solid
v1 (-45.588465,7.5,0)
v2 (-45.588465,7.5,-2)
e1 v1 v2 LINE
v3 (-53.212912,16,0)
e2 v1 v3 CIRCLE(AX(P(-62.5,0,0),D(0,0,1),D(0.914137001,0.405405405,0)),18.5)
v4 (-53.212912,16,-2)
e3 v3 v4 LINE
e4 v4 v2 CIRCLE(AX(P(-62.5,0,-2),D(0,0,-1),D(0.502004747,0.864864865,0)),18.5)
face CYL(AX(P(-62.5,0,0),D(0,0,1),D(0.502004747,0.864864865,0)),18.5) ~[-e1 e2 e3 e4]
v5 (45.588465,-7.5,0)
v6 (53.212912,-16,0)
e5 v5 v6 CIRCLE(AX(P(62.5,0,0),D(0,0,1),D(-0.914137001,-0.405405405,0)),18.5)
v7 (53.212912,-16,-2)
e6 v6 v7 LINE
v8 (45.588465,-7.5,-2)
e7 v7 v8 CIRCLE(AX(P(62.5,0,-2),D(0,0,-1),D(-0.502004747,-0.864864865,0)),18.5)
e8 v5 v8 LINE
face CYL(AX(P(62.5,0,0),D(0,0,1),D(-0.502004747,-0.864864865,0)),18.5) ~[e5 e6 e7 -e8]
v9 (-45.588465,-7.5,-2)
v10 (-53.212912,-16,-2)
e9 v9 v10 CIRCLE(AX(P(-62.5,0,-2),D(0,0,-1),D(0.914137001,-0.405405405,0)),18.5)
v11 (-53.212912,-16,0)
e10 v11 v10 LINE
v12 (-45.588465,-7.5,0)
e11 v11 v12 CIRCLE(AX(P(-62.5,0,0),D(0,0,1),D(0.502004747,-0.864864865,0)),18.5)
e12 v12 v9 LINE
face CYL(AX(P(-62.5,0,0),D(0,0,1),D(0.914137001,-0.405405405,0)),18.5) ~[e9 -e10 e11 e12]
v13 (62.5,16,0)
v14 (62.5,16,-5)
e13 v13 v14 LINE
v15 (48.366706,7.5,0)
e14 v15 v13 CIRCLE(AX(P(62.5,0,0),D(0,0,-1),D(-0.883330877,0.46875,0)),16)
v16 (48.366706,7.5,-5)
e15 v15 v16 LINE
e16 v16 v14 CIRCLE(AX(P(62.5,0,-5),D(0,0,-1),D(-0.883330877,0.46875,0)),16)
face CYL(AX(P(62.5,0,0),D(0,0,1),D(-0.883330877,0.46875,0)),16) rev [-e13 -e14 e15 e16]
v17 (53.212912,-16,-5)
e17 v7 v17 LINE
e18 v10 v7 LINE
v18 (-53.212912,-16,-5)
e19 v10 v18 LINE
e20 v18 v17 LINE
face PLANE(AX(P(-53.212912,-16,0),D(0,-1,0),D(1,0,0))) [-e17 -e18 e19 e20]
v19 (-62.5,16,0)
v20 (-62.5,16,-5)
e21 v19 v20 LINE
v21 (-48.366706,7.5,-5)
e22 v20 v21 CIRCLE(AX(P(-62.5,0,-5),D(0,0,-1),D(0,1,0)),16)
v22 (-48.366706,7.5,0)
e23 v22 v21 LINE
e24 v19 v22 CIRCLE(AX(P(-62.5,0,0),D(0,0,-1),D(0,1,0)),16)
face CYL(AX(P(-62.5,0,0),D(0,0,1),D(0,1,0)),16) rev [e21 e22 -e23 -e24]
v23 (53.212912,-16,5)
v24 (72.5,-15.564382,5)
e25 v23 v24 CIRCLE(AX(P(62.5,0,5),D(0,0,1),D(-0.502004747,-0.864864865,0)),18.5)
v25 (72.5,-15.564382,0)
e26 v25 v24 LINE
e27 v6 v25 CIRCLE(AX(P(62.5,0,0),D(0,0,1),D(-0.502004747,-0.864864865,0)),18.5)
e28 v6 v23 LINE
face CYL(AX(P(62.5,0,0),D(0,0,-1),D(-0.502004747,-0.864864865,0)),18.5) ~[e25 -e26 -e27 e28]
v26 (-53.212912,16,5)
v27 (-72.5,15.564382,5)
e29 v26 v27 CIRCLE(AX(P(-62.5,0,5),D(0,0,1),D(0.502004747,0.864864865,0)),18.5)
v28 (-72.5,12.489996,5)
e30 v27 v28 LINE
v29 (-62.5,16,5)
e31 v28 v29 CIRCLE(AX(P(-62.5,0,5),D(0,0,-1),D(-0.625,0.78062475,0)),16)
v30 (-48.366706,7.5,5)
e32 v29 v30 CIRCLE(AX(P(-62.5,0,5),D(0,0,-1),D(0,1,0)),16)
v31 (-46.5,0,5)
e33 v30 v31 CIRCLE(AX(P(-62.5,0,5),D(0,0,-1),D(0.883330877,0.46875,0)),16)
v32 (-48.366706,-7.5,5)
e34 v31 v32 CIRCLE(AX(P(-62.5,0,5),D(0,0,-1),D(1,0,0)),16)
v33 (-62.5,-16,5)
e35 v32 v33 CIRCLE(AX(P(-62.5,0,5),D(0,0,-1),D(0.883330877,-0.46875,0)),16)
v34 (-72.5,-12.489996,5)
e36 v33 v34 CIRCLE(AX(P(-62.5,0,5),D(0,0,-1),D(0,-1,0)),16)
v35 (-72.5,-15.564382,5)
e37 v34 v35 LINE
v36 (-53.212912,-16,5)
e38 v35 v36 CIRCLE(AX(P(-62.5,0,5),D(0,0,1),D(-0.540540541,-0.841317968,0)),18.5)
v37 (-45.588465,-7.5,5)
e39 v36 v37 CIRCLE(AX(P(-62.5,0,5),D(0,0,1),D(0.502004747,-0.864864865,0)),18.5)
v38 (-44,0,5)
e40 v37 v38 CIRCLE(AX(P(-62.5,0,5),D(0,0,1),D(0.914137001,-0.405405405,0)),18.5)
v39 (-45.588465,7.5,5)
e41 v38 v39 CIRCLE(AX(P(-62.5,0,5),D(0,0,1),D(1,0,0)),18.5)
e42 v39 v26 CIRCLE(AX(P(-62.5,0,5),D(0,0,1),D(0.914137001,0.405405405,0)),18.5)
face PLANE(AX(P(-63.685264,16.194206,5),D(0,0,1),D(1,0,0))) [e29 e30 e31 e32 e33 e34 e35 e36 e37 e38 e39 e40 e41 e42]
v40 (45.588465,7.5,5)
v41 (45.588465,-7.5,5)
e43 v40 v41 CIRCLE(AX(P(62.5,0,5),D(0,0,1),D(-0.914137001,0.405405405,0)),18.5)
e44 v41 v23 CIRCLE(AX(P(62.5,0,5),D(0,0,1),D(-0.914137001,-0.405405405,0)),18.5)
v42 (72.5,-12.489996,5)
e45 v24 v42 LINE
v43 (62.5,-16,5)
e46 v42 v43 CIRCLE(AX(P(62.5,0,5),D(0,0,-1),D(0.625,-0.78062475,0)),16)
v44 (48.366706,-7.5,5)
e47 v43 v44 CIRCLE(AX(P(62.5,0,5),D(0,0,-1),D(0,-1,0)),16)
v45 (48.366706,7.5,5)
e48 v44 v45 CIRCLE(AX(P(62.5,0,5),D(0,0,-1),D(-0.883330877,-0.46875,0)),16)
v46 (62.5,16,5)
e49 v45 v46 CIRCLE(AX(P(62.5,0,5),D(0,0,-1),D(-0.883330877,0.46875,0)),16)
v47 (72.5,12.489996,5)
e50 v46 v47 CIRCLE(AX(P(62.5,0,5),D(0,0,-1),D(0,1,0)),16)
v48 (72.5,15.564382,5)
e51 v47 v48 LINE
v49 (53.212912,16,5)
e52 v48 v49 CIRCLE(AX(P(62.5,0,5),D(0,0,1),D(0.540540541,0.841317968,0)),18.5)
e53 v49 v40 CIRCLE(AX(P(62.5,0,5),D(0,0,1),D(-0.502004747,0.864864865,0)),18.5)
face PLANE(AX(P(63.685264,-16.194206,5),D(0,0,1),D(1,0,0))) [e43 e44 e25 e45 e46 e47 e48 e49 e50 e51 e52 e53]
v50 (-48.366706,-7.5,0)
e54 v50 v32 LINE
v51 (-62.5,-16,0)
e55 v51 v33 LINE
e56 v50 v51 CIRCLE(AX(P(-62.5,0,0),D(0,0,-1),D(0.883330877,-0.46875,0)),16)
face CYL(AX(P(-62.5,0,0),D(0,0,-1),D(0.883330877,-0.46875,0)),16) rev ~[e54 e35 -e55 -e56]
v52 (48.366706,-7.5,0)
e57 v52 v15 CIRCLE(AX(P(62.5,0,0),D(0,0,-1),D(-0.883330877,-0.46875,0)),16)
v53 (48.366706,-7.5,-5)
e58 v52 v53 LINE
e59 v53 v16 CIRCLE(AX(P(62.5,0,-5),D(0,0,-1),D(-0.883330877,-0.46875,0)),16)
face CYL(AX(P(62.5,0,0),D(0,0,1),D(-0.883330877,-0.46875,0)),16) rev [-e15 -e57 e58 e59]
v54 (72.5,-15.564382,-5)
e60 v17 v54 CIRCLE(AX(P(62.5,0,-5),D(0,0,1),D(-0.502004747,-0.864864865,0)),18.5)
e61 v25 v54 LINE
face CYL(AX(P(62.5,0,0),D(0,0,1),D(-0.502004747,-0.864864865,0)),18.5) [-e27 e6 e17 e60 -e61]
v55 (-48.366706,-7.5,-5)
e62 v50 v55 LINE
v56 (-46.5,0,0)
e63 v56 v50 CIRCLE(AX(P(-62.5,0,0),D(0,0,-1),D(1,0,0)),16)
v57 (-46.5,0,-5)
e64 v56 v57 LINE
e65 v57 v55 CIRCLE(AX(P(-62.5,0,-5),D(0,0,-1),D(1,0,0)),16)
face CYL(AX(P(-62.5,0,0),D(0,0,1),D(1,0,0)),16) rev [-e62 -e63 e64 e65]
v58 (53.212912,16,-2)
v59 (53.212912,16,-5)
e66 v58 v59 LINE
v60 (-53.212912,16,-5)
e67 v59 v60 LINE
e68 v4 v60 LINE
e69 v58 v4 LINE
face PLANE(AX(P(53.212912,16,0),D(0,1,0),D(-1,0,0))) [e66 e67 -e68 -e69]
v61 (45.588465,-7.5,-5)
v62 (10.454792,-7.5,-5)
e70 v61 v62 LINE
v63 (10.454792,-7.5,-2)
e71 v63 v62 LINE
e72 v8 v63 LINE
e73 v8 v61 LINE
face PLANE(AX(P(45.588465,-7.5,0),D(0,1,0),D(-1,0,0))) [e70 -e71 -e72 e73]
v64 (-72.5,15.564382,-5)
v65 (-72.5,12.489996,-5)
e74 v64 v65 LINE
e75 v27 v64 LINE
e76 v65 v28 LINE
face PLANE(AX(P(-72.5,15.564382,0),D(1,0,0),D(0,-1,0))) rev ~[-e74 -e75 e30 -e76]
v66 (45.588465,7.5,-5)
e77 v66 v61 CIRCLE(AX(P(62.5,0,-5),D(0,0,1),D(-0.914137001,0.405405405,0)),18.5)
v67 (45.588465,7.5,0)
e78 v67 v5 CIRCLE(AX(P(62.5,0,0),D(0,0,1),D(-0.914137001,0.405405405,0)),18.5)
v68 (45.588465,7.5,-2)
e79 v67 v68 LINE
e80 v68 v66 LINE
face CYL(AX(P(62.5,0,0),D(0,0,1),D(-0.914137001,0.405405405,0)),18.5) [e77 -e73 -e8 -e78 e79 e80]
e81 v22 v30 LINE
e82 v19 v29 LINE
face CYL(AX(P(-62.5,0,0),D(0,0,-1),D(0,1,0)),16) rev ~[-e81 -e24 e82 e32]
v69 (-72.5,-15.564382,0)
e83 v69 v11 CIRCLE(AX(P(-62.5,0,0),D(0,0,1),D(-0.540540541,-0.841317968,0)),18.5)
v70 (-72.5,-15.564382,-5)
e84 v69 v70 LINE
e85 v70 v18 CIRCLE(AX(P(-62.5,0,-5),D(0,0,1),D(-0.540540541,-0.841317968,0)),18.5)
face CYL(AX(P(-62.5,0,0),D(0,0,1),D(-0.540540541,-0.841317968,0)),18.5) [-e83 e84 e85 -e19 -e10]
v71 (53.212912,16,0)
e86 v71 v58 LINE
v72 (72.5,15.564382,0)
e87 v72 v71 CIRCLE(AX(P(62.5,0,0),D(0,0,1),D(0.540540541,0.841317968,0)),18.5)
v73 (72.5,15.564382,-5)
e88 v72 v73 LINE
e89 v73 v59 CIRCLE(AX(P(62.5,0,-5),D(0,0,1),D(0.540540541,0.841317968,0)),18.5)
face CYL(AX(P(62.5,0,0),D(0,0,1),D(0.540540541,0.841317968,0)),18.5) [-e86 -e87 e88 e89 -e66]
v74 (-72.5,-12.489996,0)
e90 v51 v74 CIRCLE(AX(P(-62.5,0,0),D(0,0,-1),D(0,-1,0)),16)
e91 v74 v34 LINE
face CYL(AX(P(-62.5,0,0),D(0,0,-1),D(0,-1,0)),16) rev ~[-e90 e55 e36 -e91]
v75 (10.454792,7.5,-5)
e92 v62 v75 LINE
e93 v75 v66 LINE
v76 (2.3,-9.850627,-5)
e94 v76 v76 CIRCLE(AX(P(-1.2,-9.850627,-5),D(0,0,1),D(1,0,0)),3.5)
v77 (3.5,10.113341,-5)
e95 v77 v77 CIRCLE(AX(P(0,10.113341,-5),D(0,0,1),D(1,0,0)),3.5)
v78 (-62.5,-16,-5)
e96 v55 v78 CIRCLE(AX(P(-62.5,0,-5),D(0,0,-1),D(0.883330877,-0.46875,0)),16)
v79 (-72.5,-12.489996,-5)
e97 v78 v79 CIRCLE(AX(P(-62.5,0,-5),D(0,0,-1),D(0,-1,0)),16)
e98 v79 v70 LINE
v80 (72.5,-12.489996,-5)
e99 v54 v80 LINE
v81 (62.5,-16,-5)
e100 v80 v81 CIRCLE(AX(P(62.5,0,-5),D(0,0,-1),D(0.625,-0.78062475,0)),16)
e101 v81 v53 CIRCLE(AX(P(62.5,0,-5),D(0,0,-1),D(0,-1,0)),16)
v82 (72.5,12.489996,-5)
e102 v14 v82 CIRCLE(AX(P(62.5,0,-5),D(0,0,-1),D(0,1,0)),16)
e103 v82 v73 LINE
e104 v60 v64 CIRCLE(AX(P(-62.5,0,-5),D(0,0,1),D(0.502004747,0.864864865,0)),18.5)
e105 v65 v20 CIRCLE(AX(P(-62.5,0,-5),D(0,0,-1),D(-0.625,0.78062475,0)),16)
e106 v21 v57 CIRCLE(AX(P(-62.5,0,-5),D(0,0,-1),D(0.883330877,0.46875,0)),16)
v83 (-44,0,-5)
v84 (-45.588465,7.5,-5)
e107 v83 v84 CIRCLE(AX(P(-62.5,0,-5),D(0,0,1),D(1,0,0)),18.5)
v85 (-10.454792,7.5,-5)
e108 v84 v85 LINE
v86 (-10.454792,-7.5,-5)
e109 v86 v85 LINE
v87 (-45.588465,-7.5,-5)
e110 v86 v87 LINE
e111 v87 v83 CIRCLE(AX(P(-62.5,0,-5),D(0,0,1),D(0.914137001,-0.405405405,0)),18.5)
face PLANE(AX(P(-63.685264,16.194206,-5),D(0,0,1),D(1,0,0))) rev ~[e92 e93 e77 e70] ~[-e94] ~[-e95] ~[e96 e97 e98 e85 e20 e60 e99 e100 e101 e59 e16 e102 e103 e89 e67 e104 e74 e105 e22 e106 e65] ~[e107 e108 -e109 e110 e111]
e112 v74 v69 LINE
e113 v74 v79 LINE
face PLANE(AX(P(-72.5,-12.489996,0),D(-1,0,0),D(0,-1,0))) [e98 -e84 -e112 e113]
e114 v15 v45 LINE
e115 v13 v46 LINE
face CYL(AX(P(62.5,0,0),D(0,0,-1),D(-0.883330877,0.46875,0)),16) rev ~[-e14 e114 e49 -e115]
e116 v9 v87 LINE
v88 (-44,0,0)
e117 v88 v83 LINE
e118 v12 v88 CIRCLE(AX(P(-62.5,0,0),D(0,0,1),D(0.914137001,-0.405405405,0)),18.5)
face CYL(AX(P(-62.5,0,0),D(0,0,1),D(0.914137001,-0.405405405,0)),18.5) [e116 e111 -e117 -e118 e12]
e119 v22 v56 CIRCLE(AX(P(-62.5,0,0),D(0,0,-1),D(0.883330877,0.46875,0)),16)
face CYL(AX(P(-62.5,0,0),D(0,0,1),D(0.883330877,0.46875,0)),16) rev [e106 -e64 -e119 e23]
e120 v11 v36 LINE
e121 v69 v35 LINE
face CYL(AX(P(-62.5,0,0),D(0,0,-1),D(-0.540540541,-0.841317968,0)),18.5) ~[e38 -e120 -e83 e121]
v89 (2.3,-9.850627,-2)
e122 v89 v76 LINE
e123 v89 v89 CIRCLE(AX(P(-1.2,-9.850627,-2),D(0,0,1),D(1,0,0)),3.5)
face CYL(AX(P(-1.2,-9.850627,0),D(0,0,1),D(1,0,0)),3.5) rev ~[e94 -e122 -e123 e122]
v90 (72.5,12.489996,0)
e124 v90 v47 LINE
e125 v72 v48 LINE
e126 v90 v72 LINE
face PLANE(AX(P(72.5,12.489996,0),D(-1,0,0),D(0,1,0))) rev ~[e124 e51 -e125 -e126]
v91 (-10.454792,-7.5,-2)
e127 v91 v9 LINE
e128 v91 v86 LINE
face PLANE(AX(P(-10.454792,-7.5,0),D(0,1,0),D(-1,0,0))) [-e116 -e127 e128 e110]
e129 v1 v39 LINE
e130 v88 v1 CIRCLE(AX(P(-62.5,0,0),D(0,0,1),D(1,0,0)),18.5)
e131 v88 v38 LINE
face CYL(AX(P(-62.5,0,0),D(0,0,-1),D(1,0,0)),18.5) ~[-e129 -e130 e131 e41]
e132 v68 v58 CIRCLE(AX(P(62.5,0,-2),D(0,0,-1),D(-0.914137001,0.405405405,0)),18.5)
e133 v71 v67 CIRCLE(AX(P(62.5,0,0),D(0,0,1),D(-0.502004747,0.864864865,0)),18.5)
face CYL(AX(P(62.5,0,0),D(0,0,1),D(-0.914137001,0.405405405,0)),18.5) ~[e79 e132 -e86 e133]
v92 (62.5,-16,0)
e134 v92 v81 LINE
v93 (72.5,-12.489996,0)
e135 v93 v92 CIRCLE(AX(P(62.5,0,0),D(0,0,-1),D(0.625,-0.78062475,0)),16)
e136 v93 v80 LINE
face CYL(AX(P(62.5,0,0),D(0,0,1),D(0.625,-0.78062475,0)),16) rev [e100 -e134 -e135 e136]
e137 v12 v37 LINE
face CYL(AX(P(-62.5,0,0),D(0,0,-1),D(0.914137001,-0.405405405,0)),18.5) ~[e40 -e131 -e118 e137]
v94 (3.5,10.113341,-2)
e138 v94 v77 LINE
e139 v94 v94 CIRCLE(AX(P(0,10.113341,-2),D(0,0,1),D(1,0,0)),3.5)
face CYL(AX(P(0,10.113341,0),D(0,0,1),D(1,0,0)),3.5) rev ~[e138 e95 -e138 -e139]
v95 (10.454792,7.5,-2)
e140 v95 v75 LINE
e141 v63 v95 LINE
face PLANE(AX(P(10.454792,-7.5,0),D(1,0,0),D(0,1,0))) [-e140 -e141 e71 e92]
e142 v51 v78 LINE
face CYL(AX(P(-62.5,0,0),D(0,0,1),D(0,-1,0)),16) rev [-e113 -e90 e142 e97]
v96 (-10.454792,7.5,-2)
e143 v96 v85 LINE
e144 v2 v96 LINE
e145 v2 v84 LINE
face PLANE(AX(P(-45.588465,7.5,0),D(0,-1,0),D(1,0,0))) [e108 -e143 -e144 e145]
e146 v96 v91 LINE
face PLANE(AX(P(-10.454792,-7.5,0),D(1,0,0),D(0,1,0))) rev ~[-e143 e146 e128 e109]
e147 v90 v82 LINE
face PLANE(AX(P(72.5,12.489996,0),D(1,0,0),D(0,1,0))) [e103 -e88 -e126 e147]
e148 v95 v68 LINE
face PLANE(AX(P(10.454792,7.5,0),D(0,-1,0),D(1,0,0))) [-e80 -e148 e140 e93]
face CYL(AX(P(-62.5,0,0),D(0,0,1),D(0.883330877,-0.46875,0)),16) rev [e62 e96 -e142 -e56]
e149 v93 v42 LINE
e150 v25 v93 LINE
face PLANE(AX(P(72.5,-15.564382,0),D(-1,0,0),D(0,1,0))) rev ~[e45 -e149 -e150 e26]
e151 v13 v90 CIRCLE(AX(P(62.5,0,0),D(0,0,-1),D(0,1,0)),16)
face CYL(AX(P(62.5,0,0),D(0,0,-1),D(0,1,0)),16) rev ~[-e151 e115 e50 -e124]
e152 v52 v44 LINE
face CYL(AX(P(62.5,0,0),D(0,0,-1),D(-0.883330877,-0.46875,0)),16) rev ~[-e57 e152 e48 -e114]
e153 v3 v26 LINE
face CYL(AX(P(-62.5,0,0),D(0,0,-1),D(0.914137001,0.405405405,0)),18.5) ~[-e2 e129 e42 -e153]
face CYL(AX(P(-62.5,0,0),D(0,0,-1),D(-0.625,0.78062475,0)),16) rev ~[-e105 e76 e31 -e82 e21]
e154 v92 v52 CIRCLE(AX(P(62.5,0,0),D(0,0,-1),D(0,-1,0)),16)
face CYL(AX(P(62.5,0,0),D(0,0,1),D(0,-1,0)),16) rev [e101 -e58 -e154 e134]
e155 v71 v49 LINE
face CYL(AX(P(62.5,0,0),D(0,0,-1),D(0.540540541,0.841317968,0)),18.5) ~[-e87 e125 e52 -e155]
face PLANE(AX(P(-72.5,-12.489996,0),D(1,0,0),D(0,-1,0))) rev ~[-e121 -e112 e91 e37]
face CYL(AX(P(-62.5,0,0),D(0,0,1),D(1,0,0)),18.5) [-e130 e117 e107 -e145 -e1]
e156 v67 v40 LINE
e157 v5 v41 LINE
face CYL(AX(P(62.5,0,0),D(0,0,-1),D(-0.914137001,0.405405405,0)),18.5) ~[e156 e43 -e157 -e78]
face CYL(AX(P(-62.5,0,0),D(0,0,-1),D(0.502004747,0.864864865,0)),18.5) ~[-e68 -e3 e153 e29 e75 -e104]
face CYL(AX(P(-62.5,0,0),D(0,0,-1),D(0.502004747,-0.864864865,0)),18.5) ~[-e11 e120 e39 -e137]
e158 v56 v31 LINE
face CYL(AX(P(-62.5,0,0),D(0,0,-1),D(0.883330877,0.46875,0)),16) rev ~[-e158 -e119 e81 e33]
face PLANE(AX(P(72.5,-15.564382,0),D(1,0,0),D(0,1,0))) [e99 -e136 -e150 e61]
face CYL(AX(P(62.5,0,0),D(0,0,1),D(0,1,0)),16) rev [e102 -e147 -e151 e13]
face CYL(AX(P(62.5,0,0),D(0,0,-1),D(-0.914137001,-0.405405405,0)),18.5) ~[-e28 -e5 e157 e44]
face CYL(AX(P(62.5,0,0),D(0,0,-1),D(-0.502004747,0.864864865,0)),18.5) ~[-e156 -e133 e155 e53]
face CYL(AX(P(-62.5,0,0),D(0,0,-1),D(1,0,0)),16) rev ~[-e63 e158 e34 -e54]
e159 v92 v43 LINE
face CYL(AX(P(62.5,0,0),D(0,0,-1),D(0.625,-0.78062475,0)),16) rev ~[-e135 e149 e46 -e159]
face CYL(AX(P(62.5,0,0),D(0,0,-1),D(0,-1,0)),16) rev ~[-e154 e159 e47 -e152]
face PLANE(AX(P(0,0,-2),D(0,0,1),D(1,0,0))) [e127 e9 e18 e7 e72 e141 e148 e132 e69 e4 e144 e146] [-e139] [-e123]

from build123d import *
from build123d import SkipClean  # not in build123d's __all__

# Parameters (mm, degrees)
F0_W     = 20.9095849469
F0_H     = 15
F1_DEPTH = 5
F2_DEPTH = 5
F3_R     = 3.5
F4_DEPTH = 2
F5_DEPTH = 5


# Not quite as in the source:
# - after a boolean that leaves OpenCascade's solid faulty, fix() repairs it


with BuildPart() as f1:
    # F0 (on Top) → F1 (new body)
    with BuildSketch(Plane.XY):
        with BuildLine():
            Line((-62.5, 16), (-53.2129121895, 16))
            ThreePointArc((-53.2129121895, 16), (-62.9177339073, 18.4952831388), (-72.5, 15.5643824163))
            Line((-72.5, 15.5643824163), (-72.5, 12.4899959968))
            ThreePointArc((-72.5, 12.4899959968), (-67.7990595416, 15.0970185128), (-62.5, 16))
        make_face()
        with BuildLine():
            ThreePointArc((-72.5, -15.5643824163), (-62.9177339073, -18.4952831388), (-53.2129121895, -16))
            Line((-53.2129121895, -16), (-62.5, -16))
            ThreePointArc((-62.5, -16), (-67.7990595416, -15.0970185128), (-72.5, -12.4899959968))
            Line((-72.5, -12.4899959968), (-72.5, -15.5643824163))
        make_face()
        with BuildLine():
            Line((-48.3667059749, 7.5), (-45.5884654747, 7.5))
            ThreePointArc((-45.5884654747, 7.5), (-48.7284912565, 12.3529570114), (-53.2129121895, 16))
            Line((-53.2129121895, 16), (-62.5, 16))
            ThreePointArc((-62.5, 16), (-54.2537887488, 13.7113092008), (-48.3667059749, 7.5))
        make_face()
        with BuildLine():
            ThreePointArc((-53.2129121895, -16), (-48.7284912565, -12.3529570114), (-45.5884654747, -7.5))
            Line((-45.5884654747, -7.5), (-48.3667059749, -7.5))
            ThreePointArc((-48.3667059749, -7.5), (-54.2537887488, -13.7113092008), (-62.5, -16))
            Line((-62.5, -16), (-53.2129121895, -16))
        make_face()
        with BuildLine():
            ThreePointArc((-44, 0), (-44.4014725914, 3.8331847909), (-45.5884654747, 7.5))
            Line((-45.5884654747, 7.5), (-48.3667059749, 7.5))
            ThreePointArc((-48.3667059749, 7.5), (-46.9736883903, 3.86440782), (-46.5, 0))
            ThreePointArc((-46.5, 0), (-46.9736883903, -3.86440782), (-48.3667059749, -7.5))
            Line((-48.3667059749, -7.5), (-45.5884654747, -7.5))
            ThreePointArc((-45.5884654747, -7.5), (-44.4014725914, -3.8331847909), (-44, 0))
        make_face()
        with BuildLine():
            ThreePointArc((-72.5, -15.5643824163), (-62.9177339073, -18.4952831388), (-53.2129121895, -16))
            Line((-53.2129121895, -16), (-62.5, -16))
            ThreePointArc((-62.5, -16), (-67.7990595416, -15.0970185128), (-72.5, -12.4899959968))
            Line((-72.5, -12.4899959968), (-72.5, -15.5643824163))
        make_face()
        with BuildLine():
            Line((-62.5, 16), (-53.2129121895, 16))
            ThreePointArc((-53.2129121895, 16), (-62.9177339073, 18.4952831388), (-72.5, 15.5643824163))
            Line((-72.5, 15.5643824163), (-72.5, 12.4899959968))
            ThreePointArc((-72.5, 12.4899959968), (-67.7990595416, 15.0970185128), (-62.5, 16))
        make_face()
        with BuildLine():
            ThreePointArc((72.5, 15.5643824163), (62.9177339073, 18.4952831388), (53.2129121895, 16))
            Line((53.2129121895, 16), (62.5, 16))
            ThreePointArc((62.5, 16), (67.7990595416, 15.0970185128), (72.5, 12.4899959968))
            Line((72.5, 12.4899959968), (72.5, 15.5643824163))
        make_face()
        with BuildLine():
            ThreePointArc((72.5, 15.5643824163), (62.9177339073, 18.4952831388), (53.2129121895, 16))
            Line((53.2129121895, 16), (62.5, 16))
            ThreePointArc((62.5, 16), (67.7990595416, 15.0970185128), (72.5, 12.4899959968))
            Line((72.5, 12.4899959968), (72.5, 15.5643824163))
        make_face()
        with BuildLine():
            Line((62.5, -16), (53.2129121895, -16))
            ThreePointArc((53.2129121895, -16), (62.9177339073, -18.4952831388), (72.5, -15.5643824163))
            Line((72.5, -15.5643824163), (72.5, -12.4899959968))
            ThreePointArc((72.5, -12.4899959968), (67.7990595416, -15.0970185128), (62.5, -16))
        make_face()
        with BuildLine():
            ThreePointArc((53.2129121895, 16), (48.7284912565, 12.3529570114), (45.5884654747, 7.5))
            Line((45.5884654747, 7.5), (48.3667059749, 7.5))
            ThreePointArc((48.3667059749, 7.5), (54.2537887488, 13.7113092008), (62.5, 16))
            Line((62.5, 16), (53.2129121895, 16))
        make_face()
        with BuildLine():
            Line((48.3667059749, 7.5), (45.5884654747, 7.5))
            ThreePointArc((45.5884654747, 7.5), (44, 0), (45.5884654747, -7.5))
            Line((45.5884654747, -7.5), (48.3667059749, -7.5))
            ThreePointArc((48.3667059749, -7.5), (46.5, 0), (48.3667059749, 7.5))
        make_face()
        with BuildLine():
            Line((48.3667059749, -7.5), (45.5884654747, -7.5))
            ThreePointArc((45.5884654747, -7.5), (48.7284912565, -12.3529570114), (53.2129121895, -16))
            Line((53.2129121895, -16), (62.5, -16))
            ThreePointArc((62.5, -16), (54.2537887488, -13.7113092008), (48.3667059749, -7.5))
        make_face()
        with BuildLine():
            Line((62.5, -16), (53.2129121895, -16))
            ThreePointArc((53.2129121895, -16), (62.9177339073, -18.4952831388), (72.5, -15.5643824163))
            Line((72.5, -15.5643824163), (72.5, -12.4899959968))
            ThreePointArc((72.5, -12.4899959968), (67.7990595416, -15.0970185128), (62.5, -16))
        make_face()
        with BuildLine():
            Line((10.4547924735, -7.5), (-10.4547924735, -7.5))
            Line((-10.4547924735, -7.5), (-45.5884654747, -7.5))
            ThreePointArc((-45.5884654747, -7.5), (-48.7284912565, -12.3529570114), (-53.2129121895, -16))
            Line((-53.2129121895, -16), (53.2129121895, -16))
            ThreePointArc((53.2129121895, -16), (48.7284912565, -12.3529570114), (45.5884654747, -7.5))
            Line((45.5884654747, -7.5), (10.4547924735, -7.5))
        make_face()
        with BuildLine():
            Line((-45.5884654747, 7.5), (-10.4547924735, 7.5))
            Line((-10.4547924735, 7.5), (10.4547924735, 7.5))
            Line((10.4547924735, 7.5), (45.5884654747, 7.5))
            ThreePointArc((45.5884654747, 7.5), (48.7284912565, 12.3529570114), (53.2129121895, 16))
            Line((53.2129121895, 16), (-53.2129121895, 16))
            ThreePointArc((-53.2129121895, 16), (-48.7284912565, 12.3529570114), (-45.5884654747, 7.5))
        make_face()
        Rectangle(F0_W, F0_H)
    extrude(amount=-F1_DEPTH)

    # F0 (on Top) → F2 (join)
    with BuildSketch(Plane.XY):
        with BuildLine():
            Line((-62.5, 16), (-53.2129121895, 16))
            ThreePointArc((-53.2129121895, 16), (-62.9177339073, 18.4952831388), (-72.5, 15.5643824163))
            Line((-72.5, 15.5643824163), (-72.5, 12.4899959968))
            ThreePointArc((-72.5, 12.4899959968), (-67.7990595416, 15.0970185128), (-62.5, 16))
        make_face()
        with BuildLine():
            ThreePointArc((-72.5, -15.5643824163), (-62.9177339073, -18.4952831388), (-53.2129121895, -16))
            Line((-53.2129121895, -16), (-62.5, -16))
            ThreePointArc((-62.5, -16), (-67.7990595416, -15.0970185128), (-72.5, -12.4899959968))
            Line((-72.5, -12.4899959968), (-72.5, -15.5643824163))
        make_face()
        with BuildLine():
            Line((-48.3667059749, 7.5), (-45.5884654747, 7.5))
            ThreePointArc((-45.5884654747, 7.5), (-48.7284912565, 12.3529570114), (-53.2129121895, 16))
            Line((-53.2129121895, 16), (-62.5, 16))
            ThreePointArc((-62.5, 16), (-54.2537887488, 13.7113092008), (-48.3667059749, 7.5))
        make_face()
        with BuildLine():
            ThreePointArc((-53.2129121895, -16), (-48.7284912565, -12.3529570114), (-45.5884654747, -7.5))
            Line((-45.5884654747, -7.5), (-48.3667059749, -7.5))
            ThreePointArc((-48.3667059749, -7.5), (-54.2537887488, -13.7113092008), (-62.5, -16))
            Line((-62.5, -16), (-53.2129121895, -16))
        make_face()
        with BuildLine():
            ThreePointArc((-44, 0), (-44.4014725914, 3.8331847909), (-45.5884654747, 7.5))
            Line((-45.5884654747, 7.5), (-48.3667059749, 7.5))
            ThreePointArc((-48.3667059749, 7.5), (-46.9736883903, 3.86440782), (-46.5, 0))
            ThreePointArc((-46.5, 0), (-46.9736883903, -3.86440782), (-48.3667059749, -7.5))
            Line((-48.3667059749, -7.5), (-45.5884654747, -7.5))
            ThreePointArc((-45.5884654747, -7.5), (-44.4014725914, -3.8331847909), (-44, 0))
        make_face()
        with BuildLine():
            Line((-62.5, 16), (-53.2129121895, 16))
            ThreePointArc((-53.2129121895, 16), (-62.9177339073, 18.4952831388), (-72.5, 15.5643824163))
            Line((-72.5, 15.5643824163), (-72.5, 12.4899959968))
            ThreePointArc((-72.5, 12.4899959968), (-67.7990595416, 15.0970185128), (-62.5, 16))
        make_face()
        with BuildLine():
            ThreePointArc((-72.5, -15.5643824163), (-62.9177339073, -18.4952831388), (-53.2129121895, -16))
            Line((-53.2129121895, -16), (-62.5, -16))
            ThreePointArc((-62.5, -16), (-67.7990595416, -15.0970185128), (-72.5, -12.4899959968))
            Line((-72.5, -12.4899959968), (-72.5, -15.5643824163))
        make_face()
        with BuildLine():
            Line((62.5, -16), (53.2129121895, -16))
            ThreePointArc((53.2129121895, -16), (62.9177339073, -18.4952831388), (72.5, -15.5643824163))
            Line((72.5, -15.5643824163), (72.5, -12.4899959968))
            ThreePointArc((72.5, -12.4899959968), (67.7990595416, -15.0970185128), (62.5, -16))
        make_face()
        with BuildLine():
            ThreePointArc((72.5, 15.5643824163), (62.9177339073, 18.4952831388), (53.2129121895, 16))
            Line((53.2129121895, 16), (62.5, 16))
            ThreePointArc((62.5, 16), (67.7990595416, 15.0970185128), (72.5, 12.4899959968))
            Line((72.5, 12.4899959968), (72.5, 15.5643824163))
        make_face()
        with BuildLine():
            Line((62.5, -16), (53.2129121895, -16))
            ThreePointArc((53.2129121895, -16), (62.9177339073, -18.4952831388), (72.5, -15.5643824163))
            Line((72.5, -15.5643824163), (72.5, -12.4899959968))
            ThreePointArc((72.5, -12.4899959968), (67.7990595416, -15.0970185128), (62.5, -16))
        make_face()
        with BuildLine():
            ThreePointArc((53.2129121895, 16), (48.7284912565, 12.3529570114), (45.5884654747, 7.5))
            Line((45.5884654747, 7.5), (48.3667059749, 7.5))
            ThreePointArc((48.3667059749, 7.5), (54.2537887488, 13.7113092008), (62.5, 16))
            Line((62.5, 16), (53.2129121895, 16))
        make_face()
        with BuildLine():
            Line((48.3667059749, 7.5), (45.5884654747, 7.5))
            ThreePointArc((45.5884654747, 7.5), (44, 0), (45.5884654747, -7.5))
            Line((45.5884654747, -7.5), (48.3667059749, -7.5))
            ThreePointArc((48.3667059749, -7.5), (46.5, 0), (48.3667059749, 7.5))
        make_face()
        with BuildLine():
            Line((48.3667059749, -7.5), (45.5884654747, -7.5))
            ThreePointArc((45.5884654747, -7.5), (48.7284912565, -12.3529570114), (53.2129121895, -16))
            Line((53.2129121895, -16), (62.5, -16))
            ThreePointArc((62.5, -16), (54.2537887488, -13.7113092008), (48.3667059749, -7.5))
        make_face()
        with BuildLine():
            ThreePointArc((72.5, 15.5643824163), (62.9177339073, 18.4952831388), (53.2129121895, 16))
            Line((53.2129121895, 16), (62.5, 16))
            ThreePointArc((62.5, 16), (67.7990595416, 15.0970185128), (72.5, 12.4899959968))
            Line((72.5, 12.4899959968), (72.5, 15.5643824163))
        make_face()
    extrude(amount=F2_DEPTH)

    # F3 (on face) → F4 (cut)
    with BuildSketch(Plane.XY):
        with BuildLine():
            ThreePointArc((45.5884654747, 7.5), (48.7284912565, 12.3529570114), (53.2129121895, 16))
            Line((53.2129121895, 16), (-53.2129121895, 16))
            ThreePointArc((-53.2129121895, 16), (-48.7284912565, 12.3529570114), (-45.5884654747, 7.5))
            Line((-45.5884654747, 7.5), (-10.4547924735, 7.5))
            Line((-10.4547924735, 7.5), (-10.4547924735, -7.5))
            Line((-10.4547924735, -7.5), (-45.5884654747, -7.5))
            ThreePointArc((-45.5884654747, -7.5), (-48.7284912565, -12.3529570114), (-53.2129121895, -16))
            Line((-53.2129121895, -16), (53.2129121895, -16))
            ThreePointArc((53.2129121895, -16), (48.7284912565, -12.3529570114), (45.5884654747, -7.5))
            Line((45.5884654747, -7.5), (10.4547924735, -7.5))
            Line((10.4547924735, -7.5), (10.4547924735, 7.5))
            Line((10.4547924735, 7.5), (45.5884654747, 7.5))
        make_face()
        with Locations((-1.2, -9.8506268114)):
            Circle(F3_R, mode=Mode.SUBTRACT)
        with Locations((0, 10.1133407302)):
            Circle(F3_R, mode=Mode.SUBTRACT)
        with BuildLine():
            ThreePointArc((45.5884654747, 7.5), (48.7284912565, 12.3529570114), (53.2129121895, 16))
            Line((53.2129121895, 16), (-53.2129121895, 16))
            ThreePointArc((-53.2129121895, 16), (-48.7284912565, 12.3529570114), (-45.5884654747, 7.5))
            Line((-45.5884654747, 7.5), (-10.4547924735, 7.5))
            Line((-10.4547924735, 7.5), (-10.4547924735, -7.5))
            Line((-10.4547924735, -7.5), (-45.5884654747, -7.5))
            ThreePointArc((-45.5884654747, -7.5), (-48.7284912565, -12.3529570114), (-53.2129121895, -16))
            Line((-53.2129121895, -16), (53.2129121895, -16))
            ThreePointArc((53.2129121895, -16), (48.7284912565, -12.3529570114), (45.5884654747, -7.5))
            Line((45.5884654747, -7.5), (10.4547924735, -7.5))
            Line((10.4547924735, -7.5), (10.4547924735, 7.5))
            Line((10.4547924735, 7.5), (45.5884654747, 7.5))
        make_face()
        with Locations((-1.2, -9.8506268114)):
            Circle(F3_R, mode=Mode.SUBTRACT)
        with Locations((0, 10.1133407302)):
            Circle(F3_R, mode=Mode.SUBTRACT)
    with SkipClean():  # cleaning this boolean's faces spoils the solid; the shape is the same uncleaned
        extrude(amount=-F4_DEPTH, mode=Mode.SUBTRACT)

    # F5 (cut, through all): faces of the model
    f5_faces = [f1.faces().sort_by_distance(p)[0] for p in [
        (0, 10.1133407302, 0),
        (-1.2, -9.8506268114, 0),
    ]]
    extrude(f5_faces, amount=-F5_DEPTH, mode=Mode.SUBTRACT)

    add(f1.part.fix(), mode=Mode.REPLACE)


solid = f1.part
